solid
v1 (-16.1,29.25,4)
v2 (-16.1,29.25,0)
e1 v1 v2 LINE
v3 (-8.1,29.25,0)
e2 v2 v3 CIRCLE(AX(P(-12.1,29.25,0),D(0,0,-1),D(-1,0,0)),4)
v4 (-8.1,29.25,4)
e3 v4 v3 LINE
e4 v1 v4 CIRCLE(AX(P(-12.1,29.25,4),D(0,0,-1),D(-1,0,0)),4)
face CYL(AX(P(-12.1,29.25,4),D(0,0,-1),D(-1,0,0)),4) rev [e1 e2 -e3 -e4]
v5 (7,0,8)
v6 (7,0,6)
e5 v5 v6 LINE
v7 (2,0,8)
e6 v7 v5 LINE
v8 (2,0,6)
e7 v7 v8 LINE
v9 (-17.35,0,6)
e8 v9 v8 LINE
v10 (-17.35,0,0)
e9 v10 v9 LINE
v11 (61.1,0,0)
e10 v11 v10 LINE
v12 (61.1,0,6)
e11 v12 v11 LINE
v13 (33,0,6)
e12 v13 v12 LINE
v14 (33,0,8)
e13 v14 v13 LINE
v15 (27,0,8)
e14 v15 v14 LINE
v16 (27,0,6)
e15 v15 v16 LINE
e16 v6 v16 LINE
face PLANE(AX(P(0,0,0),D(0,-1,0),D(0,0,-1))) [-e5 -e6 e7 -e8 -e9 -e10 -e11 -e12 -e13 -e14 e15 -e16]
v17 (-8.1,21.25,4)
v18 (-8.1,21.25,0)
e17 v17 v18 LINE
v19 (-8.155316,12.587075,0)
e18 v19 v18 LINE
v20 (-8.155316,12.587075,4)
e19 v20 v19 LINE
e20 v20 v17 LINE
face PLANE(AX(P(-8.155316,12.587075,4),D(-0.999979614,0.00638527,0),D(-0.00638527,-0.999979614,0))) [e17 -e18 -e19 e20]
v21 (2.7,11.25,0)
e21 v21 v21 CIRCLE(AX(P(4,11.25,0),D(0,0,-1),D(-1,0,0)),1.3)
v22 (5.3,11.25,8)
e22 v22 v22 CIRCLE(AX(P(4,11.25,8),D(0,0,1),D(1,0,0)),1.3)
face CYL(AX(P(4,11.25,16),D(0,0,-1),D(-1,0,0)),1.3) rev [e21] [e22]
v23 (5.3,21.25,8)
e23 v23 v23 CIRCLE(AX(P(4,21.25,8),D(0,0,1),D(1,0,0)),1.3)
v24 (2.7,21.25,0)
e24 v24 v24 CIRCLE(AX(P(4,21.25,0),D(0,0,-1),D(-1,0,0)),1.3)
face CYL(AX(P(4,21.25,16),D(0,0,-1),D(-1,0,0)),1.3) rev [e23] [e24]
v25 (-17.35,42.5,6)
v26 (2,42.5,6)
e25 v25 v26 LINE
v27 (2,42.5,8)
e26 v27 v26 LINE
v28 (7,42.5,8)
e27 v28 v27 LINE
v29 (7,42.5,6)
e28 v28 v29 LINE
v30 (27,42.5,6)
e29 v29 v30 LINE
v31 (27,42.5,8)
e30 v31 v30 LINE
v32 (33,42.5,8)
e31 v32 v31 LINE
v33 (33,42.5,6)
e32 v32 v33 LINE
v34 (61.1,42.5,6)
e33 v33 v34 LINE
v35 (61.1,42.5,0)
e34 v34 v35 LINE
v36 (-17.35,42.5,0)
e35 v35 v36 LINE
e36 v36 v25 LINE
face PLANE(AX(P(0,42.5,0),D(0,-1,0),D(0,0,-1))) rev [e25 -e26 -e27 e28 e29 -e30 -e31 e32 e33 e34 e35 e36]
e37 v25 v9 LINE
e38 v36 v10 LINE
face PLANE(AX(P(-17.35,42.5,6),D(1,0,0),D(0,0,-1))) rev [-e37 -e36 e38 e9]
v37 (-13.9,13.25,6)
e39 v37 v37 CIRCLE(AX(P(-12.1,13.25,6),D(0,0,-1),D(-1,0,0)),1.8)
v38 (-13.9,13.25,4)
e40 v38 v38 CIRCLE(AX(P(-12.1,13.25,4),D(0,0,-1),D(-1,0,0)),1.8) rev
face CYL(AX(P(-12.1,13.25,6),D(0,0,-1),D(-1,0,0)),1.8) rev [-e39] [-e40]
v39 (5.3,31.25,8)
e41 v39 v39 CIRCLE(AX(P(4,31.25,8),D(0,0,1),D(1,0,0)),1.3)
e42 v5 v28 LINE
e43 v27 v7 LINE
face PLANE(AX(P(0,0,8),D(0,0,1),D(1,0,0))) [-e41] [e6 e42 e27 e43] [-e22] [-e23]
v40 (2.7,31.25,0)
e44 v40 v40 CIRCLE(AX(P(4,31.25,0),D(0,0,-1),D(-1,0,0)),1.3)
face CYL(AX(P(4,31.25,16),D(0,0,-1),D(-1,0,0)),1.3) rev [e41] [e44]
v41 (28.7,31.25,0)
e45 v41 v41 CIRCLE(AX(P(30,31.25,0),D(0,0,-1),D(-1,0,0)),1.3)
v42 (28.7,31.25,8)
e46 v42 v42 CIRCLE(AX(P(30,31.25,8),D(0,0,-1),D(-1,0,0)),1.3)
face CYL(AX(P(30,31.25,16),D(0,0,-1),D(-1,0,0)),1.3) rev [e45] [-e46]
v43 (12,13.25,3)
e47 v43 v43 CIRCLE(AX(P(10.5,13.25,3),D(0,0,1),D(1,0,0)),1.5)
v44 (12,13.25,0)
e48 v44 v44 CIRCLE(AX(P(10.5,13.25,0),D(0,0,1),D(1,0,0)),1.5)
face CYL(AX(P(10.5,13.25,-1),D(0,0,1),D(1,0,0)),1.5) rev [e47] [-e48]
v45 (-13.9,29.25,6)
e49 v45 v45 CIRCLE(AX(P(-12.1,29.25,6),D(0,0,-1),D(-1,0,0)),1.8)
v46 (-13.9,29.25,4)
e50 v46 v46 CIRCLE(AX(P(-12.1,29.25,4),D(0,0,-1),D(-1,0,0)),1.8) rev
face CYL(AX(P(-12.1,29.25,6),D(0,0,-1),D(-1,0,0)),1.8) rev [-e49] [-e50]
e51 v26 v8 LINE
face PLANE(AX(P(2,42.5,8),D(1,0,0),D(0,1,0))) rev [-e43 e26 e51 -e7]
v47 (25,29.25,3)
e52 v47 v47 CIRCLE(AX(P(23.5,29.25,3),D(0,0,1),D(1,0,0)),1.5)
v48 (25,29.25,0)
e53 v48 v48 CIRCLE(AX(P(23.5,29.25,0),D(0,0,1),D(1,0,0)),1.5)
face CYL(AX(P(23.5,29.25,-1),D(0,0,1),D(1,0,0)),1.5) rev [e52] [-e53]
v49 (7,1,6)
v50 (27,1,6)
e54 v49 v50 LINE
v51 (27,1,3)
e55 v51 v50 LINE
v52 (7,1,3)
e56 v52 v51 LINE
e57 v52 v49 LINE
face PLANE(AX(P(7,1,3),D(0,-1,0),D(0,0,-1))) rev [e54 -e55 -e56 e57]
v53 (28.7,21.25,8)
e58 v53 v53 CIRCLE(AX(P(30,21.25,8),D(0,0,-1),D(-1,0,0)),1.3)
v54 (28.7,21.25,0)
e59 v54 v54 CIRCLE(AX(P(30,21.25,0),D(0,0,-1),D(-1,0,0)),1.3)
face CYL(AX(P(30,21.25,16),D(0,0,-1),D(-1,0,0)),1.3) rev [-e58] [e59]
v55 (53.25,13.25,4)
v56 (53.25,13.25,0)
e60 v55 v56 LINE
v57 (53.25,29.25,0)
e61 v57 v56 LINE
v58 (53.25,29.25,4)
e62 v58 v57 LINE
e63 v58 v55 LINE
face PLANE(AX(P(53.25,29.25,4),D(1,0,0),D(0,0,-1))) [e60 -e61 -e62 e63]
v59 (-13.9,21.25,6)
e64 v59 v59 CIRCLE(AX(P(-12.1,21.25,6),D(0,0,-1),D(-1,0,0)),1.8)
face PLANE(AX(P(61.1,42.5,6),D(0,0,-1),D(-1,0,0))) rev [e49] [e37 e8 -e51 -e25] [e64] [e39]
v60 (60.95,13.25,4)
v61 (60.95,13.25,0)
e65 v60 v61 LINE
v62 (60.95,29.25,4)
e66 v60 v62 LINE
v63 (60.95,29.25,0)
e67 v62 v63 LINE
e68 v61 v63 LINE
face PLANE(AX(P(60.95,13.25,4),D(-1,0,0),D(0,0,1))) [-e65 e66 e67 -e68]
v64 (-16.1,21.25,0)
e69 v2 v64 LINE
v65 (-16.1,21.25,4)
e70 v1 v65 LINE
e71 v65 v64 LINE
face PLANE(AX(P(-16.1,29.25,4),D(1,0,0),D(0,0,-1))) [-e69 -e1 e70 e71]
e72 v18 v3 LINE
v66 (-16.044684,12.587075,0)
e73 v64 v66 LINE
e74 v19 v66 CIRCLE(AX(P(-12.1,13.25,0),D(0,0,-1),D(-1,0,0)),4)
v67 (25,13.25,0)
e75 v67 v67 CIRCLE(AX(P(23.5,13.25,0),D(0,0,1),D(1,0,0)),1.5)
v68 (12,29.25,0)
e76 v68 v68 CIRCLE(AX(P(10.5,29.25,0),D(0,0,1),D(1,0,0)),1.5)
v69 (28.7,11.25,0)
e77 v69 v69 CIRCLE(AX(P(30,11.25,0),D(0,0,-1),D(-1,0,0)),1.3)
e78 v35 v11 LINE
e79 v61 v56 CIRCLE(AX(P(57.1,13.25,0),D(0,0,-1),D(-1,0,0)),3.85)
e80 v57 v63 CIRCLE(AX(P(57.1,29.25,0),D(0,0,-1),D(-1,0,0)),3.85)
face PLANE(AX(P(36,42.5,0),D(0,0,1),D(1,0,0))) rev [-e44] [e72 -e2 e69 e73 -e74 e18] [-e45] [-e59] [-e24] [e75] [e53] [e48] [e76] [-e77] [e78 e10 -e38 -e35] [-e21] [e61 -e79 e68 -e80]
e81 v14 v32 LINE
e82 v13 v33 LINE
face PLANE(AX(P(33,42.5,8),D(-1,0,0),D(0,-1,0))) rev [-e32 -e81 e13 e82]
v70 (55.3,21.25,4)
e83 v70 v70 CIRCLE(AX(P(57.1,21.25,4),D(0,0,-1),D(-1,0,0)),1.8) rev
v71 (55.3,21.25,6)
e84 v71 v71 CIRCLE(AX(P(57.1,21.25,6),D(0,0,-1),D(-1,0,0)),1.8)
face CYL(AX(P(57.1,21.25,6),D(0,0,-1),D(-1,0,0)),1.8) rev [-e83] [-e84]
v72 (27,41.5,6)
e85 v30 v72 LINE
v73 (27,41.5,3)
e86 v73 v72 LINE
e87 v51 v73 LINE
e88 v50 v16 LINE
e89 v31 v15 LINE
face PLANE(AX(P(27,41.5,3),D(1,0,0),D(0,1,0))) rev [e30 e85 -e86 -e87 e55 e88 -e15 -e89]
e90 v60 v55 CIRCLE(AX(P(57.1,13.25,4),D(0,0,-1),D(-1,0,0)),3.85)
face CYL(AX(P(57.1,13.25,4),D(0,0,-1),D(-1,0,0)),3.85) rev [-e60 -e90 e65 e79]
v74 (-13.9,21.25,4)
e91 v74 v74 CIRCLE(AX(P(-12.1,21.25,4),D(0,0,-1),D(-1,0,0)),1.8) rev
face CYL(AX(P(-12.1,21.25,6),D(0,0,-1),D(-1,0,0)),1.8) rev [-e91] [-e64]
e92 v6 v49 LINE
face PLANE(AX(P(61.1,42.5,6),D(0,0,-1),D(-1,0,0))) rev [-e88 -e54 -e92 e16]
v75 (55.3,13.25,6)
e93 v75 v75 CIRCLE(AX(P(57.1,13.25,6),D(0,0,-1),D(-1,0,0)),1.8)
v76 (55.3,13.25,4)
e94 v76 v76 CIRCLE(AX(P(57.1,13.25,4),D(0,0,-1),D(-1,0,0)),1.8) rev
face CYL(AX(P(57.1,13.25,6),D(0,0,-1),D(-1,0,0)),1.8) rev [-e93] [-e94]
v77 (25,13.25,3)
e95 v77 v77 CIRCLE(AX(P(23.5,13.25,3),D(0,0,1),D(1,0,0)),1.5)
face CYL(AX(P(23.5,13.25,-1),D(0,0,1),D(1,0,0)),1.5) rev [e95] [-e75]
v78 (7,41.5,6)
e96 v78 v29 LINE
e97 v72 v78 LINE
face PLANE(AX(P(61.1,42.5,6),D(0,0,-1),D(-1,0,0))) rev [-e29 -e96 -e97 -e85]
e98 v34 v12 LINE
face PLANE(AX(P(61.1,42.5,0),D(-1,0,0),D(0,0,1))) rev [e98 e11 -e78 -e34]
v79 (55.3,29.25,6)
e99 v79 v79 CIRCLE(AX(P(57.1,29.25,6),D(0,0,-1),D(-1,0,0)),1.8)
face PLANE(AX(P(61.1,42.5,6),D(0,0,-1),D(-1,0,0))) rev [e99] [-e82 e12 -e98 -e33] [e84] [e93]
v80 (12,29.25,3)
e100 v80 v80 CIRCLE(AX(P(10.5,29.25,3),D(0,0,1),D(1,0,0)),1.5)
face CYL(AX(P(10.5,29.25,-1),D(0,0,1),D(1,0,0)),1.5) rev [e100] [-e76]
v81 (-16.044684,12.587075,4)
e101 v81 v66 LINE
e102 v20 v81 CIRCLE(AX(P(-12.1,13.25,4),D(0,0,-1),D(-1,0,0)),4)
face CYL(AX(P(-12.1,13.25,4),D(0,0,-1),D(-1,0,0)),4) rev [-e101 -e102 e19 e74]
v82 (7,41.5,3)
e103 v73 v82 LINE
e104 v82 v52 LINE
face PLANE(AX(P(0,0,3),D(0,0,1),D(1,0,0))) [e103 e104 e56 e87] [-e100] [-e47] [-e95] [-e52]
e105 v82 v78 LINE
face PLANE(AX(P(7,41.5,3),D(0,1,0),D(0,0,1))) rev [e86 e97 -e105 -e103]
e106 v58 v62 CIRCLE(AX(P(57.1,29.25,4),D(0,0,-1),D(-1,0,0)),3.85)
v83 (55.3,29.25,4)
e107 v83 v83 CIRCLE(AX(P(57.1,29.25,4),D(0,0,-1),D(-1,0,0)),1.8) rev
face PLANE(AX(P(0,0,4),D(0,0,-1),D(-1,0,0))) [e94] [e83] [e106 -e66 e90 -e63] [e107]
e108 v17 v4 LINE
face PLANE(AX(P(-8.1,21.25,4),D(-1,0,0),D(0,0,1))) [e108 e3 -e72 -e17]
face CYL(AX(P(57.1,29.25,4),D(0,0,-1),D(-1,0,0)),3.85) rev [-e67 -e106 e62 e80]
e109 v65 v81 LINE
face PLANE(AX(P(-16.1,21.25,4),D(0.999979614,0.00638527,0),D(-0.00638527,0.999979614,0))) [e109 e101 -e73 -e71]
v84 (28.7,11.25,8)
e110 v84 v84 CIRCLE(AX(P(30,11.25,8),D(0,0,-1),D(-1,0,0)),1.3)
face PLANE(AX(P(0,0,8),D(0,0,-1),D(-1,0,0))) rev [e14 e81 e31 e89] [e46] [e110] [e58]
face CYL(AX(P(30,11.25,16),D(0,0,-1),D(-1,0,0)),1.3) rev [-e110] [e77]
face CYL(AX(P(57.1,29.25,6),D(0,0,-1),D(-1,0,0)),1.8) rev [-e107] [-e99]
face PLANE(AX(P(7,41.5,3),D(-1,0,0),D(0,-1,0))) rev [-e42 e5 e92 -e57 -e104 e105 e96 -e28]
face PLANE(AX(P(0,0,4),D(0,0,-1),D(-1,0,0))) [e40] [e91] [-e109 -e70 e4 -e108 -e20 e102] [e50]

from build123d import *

# Parameters (mm, degrees)
EXTRUDE_1_DEPTH         = 42.5
SKETCH_2_W              = 20
SKETCH_2_H              = 40.5
CUT_EXTRUDE_2_DEPTH     = 3
SKETCH_4_R              = 1.5
CUT_EXTRUDE_4_DEPTH     = 4
CUT_EXTRUDE_START       = -6
SKETCH_5_R              = 1.8
CUT_EXTRUDE_5_DEPTH     = 6
SKETCH_6_R              = 1.8
CUT_EXTRUDE_6_DEPTH     = 6
CUT_EXTRUDE_START_2     = -4
CUT_EXTRUDE_9_OUTLINE_R = 1.8
CUT_EXTRUDE_9_DEPTH     = 4
SKETCH_8_R              = 1.3
CUT_EXTRUDE_10_DEPTH    = 16
EXTRUDE_2_DEPTH         = 2
SKETCH_10_R             = 1.3
CUT_EXTRUDE_11_DEPTH    = 16


# Read off the part's stored shape, not the designer's step: 除料-伸長9
with BuildPart() as part:
    # 草圖1 → 填料-伸長1 (new body)
    with BuildSketch(Plane(origin=(0, 0, 0), x_dir=(1, 0, 0), z_dir=(0, 1, 0))):
        Polygon((36, 0), (61.1, 0), (61.1, -6), (-17.35, -6), (-17.35, 0), (0, 0), align=None)
    extrude(amount=EXTRUDE_1_DEPTH)

    # 草圖2 → 除料-伸長2 (cut)
    with BuildSketch(Plane.XY.offset(6)):
        with Locations((17, 21.25)):
            Rectangle(SKETCH_2_W, SKETCH_2_H)
    extrude(amount=-CUT_EXTRUDE_2_DEPTH, mode=Mode.SUBTRACT)

    # 草圖4 → 除料-伸長4 (cut)
    with BuildSketch(Plane.XY.offset(3)):
        with Locations((23.5, 29.25)):
            Circle(SKETCH_4_R)
        with Locations((10.5, 29.25)):
            Circle(SKETCH_4_R)
        with Locations((10.5, 13.25)):
            Circle(SKETCH_4_R)
        with Locations((23.5, 13.25)):
            Circle(SKETCH_4_R)
    extrude(amount=-CUT_EXTRUDE_4_DEPTH, mode=Mode.SUBTRACT)

    # 草圖5 → 除料-伸長5 (cut)
    with BuildSketch(Plane(origin=(0, 0, 0), x_dir=(-1, 0, 0), z_dir=(0, 0, -1)).offset(CUT_EXTRUDE_START)):
        with Locations((12.1, 29.25)):
            Circle(SKETCH_5_R)
        with Locations((12.1, 21.25)):
            Circle(SKETCH_5_R)
        with Locations((12.1, 13.25)):
            Circle(SKETCH_5_R)
    extrude(amount=CUT_EXTRUDE_5_DEPTH, mode=Mode.SUBTRACT)

    # 草圖6 → 除料-伸長6 (cut)
    with BuildSketch(Plane(origin=(0, 0, 0), x_dir=(-1, 0, 0), z_dir=(0, 0, -1)).offset(CUT_EXTRUDE_START)):
        with Locations((-57.1, 29.25)):
            Circle(SKETCH_6_R)
        with Locations((-57.1, 21.25)):
            Circle(SKETCH_6_R)
        with Locations((-57.1, 13.25)):
            Circle(SKETCH_6_R)
    extrude(amount=CUT_EXTRUDE_6_DEPTH, mode=Mode.SUBTRACT)

    # 除料-伸長9 outline → 除料-伸長9 (cut)
    # profile 1 of 2: a face of its own
    with BuildSketch(Plane(origin=(0, 0, 0), x_dir=(-1, 0, 0), z_dir=(0, 0, -1)).offset(CUT_EXTRUDE_START_2)):
        with BuildLine():
            Line((-60.95, 29.25), (-60.95, 13.25))
            ThreePointArc((-60.95, 13.25), (-57.1, 9.4), (-53.25, 13.25))
            Line((-53.25, 13.25), (-53.25, 29.25))
            ThreePointArc((-53.25, 29.25), (-57.1, 33.1), (-60.95, 29.25))
        make_face()
        with Locations((-57.1, 13.25)):
            Circle(CUT_EXTRUDE_9_OUTLINE_R, mode=Mode.SUBTRACT)
        with Locations((-57.1, 21.25)):
            Circle(CUT_EXTRUDE_9_OUTLINE_R, mode=Mode.SUBTRACT)
        with Locations((-57.1, 29.25)):
            Circle(CUT_EXTRUDE_9_OUTLINE_R, mode=Mode.SUBTRACT)
    # profile 2 of 2: a face of its own
    with BuildSketch(Plane(origin=(0, 0, 0), x_dir=(-1, 0, 0), z_dir=(0, 0, -1)).offset(CUT_EXTRUDE_START_2)):
        with BuildLine():
            Line((8.1, 21.25), (8.155316246, 12.587074601))
            ThreePointArc((8.155316246, 12.587074601), (12.1, 9.25), (16.044683754, 12.587074601))
            Line((16.044683754, 12.587074601), (16.1, 21.25))
            Line((16.1, 21.25), (16.1, 29.25))
            ThreePointArc((16.1, 29.25), (12.1, 33.25), (8.1, 29.25))
            Line((8.1, 29.25), (8.1, 21.25))
        make_face()
        with Locations((12.1, 13.25)):
            Circle(CUT_EXTRUDE_9_OUTLINE_R, mode=Mode.SUBTRACT)
        with Locations((12.1, 21.25)):
            Circle(CUT_EXTRUDE_9_OUTLINE_R, mode=Mode.SUBTRACT)
        with Locations((12.1, 29.25)):
            Circle(CUT_EXTRUDE_9_OUTLINE_R, mode=Mode.SUBTRACT)
    extrude(amount=CUT_EXTRUDE_9_DEPTH, mode=Mode.SUBTRACT)

    # 草圖8 → 除料-伸長10 (cut)
    with BuildSketch(Plane(origin=(0, 0, 0), x_dir=(-1, 0, 0), z_dir=(0, 0, -1))):
        with Locations((-4, 31.25)):
            Circle(SKETCH_8_R)
        with Locations((-4, 21.25)):
            Circle(SKETCH_8_R)
        with Locations((-4, 11.25)):
            Circle(SKETCH_8_R)
        with Locations((-30, 11.25)):
            Circle(SKETCH_8_R)
        with Locations((-30, 21.25)):
            Circle(SKETCH_8_R)
        with Locations((-30, 31.25)):
            Circle(SKETCH_8_R)
    extrude(amount=-CUT_EXTRUDE_10_DEPTH, mode=Mode.SUBTRACT)

    # 草圖9 → 填料-伸長2 (add)
    with BuildSketch(Plane.XY.offset(6)):
        Polygon((7, 41.5), (7, 42.5), (2, 42.5), (2, 0), (7, 0), (7, 1), align=None)
        Polygon((27, 41.5), (27, 42.5), (33, 42.5), (33, 0), (27, 0), align=None)
    extrude(amount=EXTRUDE_2_DEPTH)

    # 草圖10 → 除料-伸長11 (cut)
    with BuildSketch(Plane(origin=(0, 0, 0), x_dir=(-1, 0, 0), z_dir=(0, 0, -1))):
        with Locations((-30, 31.25)):
            Circle(SKETCH_10_R)
        with Locations((-30, 21.25)):
            Circle(SKETCH_10_R)
        with Locations((-30, 11.25)):
            Circle(SKETCH_10_R)
        with Locations((-4, 11.25)):
            Circle(SKETCH_10_R)
        with Locations((-4, 21.25)):
            Circle(SKETCH_10_R)
        with Locations((-4, 31.25)):
            Circle(SKETCH_10_R)
    extrude(amount=-CUT_EXTRUDE_11_DEPTH, mode=Mode.SUBTRACT)


solid = part.part
